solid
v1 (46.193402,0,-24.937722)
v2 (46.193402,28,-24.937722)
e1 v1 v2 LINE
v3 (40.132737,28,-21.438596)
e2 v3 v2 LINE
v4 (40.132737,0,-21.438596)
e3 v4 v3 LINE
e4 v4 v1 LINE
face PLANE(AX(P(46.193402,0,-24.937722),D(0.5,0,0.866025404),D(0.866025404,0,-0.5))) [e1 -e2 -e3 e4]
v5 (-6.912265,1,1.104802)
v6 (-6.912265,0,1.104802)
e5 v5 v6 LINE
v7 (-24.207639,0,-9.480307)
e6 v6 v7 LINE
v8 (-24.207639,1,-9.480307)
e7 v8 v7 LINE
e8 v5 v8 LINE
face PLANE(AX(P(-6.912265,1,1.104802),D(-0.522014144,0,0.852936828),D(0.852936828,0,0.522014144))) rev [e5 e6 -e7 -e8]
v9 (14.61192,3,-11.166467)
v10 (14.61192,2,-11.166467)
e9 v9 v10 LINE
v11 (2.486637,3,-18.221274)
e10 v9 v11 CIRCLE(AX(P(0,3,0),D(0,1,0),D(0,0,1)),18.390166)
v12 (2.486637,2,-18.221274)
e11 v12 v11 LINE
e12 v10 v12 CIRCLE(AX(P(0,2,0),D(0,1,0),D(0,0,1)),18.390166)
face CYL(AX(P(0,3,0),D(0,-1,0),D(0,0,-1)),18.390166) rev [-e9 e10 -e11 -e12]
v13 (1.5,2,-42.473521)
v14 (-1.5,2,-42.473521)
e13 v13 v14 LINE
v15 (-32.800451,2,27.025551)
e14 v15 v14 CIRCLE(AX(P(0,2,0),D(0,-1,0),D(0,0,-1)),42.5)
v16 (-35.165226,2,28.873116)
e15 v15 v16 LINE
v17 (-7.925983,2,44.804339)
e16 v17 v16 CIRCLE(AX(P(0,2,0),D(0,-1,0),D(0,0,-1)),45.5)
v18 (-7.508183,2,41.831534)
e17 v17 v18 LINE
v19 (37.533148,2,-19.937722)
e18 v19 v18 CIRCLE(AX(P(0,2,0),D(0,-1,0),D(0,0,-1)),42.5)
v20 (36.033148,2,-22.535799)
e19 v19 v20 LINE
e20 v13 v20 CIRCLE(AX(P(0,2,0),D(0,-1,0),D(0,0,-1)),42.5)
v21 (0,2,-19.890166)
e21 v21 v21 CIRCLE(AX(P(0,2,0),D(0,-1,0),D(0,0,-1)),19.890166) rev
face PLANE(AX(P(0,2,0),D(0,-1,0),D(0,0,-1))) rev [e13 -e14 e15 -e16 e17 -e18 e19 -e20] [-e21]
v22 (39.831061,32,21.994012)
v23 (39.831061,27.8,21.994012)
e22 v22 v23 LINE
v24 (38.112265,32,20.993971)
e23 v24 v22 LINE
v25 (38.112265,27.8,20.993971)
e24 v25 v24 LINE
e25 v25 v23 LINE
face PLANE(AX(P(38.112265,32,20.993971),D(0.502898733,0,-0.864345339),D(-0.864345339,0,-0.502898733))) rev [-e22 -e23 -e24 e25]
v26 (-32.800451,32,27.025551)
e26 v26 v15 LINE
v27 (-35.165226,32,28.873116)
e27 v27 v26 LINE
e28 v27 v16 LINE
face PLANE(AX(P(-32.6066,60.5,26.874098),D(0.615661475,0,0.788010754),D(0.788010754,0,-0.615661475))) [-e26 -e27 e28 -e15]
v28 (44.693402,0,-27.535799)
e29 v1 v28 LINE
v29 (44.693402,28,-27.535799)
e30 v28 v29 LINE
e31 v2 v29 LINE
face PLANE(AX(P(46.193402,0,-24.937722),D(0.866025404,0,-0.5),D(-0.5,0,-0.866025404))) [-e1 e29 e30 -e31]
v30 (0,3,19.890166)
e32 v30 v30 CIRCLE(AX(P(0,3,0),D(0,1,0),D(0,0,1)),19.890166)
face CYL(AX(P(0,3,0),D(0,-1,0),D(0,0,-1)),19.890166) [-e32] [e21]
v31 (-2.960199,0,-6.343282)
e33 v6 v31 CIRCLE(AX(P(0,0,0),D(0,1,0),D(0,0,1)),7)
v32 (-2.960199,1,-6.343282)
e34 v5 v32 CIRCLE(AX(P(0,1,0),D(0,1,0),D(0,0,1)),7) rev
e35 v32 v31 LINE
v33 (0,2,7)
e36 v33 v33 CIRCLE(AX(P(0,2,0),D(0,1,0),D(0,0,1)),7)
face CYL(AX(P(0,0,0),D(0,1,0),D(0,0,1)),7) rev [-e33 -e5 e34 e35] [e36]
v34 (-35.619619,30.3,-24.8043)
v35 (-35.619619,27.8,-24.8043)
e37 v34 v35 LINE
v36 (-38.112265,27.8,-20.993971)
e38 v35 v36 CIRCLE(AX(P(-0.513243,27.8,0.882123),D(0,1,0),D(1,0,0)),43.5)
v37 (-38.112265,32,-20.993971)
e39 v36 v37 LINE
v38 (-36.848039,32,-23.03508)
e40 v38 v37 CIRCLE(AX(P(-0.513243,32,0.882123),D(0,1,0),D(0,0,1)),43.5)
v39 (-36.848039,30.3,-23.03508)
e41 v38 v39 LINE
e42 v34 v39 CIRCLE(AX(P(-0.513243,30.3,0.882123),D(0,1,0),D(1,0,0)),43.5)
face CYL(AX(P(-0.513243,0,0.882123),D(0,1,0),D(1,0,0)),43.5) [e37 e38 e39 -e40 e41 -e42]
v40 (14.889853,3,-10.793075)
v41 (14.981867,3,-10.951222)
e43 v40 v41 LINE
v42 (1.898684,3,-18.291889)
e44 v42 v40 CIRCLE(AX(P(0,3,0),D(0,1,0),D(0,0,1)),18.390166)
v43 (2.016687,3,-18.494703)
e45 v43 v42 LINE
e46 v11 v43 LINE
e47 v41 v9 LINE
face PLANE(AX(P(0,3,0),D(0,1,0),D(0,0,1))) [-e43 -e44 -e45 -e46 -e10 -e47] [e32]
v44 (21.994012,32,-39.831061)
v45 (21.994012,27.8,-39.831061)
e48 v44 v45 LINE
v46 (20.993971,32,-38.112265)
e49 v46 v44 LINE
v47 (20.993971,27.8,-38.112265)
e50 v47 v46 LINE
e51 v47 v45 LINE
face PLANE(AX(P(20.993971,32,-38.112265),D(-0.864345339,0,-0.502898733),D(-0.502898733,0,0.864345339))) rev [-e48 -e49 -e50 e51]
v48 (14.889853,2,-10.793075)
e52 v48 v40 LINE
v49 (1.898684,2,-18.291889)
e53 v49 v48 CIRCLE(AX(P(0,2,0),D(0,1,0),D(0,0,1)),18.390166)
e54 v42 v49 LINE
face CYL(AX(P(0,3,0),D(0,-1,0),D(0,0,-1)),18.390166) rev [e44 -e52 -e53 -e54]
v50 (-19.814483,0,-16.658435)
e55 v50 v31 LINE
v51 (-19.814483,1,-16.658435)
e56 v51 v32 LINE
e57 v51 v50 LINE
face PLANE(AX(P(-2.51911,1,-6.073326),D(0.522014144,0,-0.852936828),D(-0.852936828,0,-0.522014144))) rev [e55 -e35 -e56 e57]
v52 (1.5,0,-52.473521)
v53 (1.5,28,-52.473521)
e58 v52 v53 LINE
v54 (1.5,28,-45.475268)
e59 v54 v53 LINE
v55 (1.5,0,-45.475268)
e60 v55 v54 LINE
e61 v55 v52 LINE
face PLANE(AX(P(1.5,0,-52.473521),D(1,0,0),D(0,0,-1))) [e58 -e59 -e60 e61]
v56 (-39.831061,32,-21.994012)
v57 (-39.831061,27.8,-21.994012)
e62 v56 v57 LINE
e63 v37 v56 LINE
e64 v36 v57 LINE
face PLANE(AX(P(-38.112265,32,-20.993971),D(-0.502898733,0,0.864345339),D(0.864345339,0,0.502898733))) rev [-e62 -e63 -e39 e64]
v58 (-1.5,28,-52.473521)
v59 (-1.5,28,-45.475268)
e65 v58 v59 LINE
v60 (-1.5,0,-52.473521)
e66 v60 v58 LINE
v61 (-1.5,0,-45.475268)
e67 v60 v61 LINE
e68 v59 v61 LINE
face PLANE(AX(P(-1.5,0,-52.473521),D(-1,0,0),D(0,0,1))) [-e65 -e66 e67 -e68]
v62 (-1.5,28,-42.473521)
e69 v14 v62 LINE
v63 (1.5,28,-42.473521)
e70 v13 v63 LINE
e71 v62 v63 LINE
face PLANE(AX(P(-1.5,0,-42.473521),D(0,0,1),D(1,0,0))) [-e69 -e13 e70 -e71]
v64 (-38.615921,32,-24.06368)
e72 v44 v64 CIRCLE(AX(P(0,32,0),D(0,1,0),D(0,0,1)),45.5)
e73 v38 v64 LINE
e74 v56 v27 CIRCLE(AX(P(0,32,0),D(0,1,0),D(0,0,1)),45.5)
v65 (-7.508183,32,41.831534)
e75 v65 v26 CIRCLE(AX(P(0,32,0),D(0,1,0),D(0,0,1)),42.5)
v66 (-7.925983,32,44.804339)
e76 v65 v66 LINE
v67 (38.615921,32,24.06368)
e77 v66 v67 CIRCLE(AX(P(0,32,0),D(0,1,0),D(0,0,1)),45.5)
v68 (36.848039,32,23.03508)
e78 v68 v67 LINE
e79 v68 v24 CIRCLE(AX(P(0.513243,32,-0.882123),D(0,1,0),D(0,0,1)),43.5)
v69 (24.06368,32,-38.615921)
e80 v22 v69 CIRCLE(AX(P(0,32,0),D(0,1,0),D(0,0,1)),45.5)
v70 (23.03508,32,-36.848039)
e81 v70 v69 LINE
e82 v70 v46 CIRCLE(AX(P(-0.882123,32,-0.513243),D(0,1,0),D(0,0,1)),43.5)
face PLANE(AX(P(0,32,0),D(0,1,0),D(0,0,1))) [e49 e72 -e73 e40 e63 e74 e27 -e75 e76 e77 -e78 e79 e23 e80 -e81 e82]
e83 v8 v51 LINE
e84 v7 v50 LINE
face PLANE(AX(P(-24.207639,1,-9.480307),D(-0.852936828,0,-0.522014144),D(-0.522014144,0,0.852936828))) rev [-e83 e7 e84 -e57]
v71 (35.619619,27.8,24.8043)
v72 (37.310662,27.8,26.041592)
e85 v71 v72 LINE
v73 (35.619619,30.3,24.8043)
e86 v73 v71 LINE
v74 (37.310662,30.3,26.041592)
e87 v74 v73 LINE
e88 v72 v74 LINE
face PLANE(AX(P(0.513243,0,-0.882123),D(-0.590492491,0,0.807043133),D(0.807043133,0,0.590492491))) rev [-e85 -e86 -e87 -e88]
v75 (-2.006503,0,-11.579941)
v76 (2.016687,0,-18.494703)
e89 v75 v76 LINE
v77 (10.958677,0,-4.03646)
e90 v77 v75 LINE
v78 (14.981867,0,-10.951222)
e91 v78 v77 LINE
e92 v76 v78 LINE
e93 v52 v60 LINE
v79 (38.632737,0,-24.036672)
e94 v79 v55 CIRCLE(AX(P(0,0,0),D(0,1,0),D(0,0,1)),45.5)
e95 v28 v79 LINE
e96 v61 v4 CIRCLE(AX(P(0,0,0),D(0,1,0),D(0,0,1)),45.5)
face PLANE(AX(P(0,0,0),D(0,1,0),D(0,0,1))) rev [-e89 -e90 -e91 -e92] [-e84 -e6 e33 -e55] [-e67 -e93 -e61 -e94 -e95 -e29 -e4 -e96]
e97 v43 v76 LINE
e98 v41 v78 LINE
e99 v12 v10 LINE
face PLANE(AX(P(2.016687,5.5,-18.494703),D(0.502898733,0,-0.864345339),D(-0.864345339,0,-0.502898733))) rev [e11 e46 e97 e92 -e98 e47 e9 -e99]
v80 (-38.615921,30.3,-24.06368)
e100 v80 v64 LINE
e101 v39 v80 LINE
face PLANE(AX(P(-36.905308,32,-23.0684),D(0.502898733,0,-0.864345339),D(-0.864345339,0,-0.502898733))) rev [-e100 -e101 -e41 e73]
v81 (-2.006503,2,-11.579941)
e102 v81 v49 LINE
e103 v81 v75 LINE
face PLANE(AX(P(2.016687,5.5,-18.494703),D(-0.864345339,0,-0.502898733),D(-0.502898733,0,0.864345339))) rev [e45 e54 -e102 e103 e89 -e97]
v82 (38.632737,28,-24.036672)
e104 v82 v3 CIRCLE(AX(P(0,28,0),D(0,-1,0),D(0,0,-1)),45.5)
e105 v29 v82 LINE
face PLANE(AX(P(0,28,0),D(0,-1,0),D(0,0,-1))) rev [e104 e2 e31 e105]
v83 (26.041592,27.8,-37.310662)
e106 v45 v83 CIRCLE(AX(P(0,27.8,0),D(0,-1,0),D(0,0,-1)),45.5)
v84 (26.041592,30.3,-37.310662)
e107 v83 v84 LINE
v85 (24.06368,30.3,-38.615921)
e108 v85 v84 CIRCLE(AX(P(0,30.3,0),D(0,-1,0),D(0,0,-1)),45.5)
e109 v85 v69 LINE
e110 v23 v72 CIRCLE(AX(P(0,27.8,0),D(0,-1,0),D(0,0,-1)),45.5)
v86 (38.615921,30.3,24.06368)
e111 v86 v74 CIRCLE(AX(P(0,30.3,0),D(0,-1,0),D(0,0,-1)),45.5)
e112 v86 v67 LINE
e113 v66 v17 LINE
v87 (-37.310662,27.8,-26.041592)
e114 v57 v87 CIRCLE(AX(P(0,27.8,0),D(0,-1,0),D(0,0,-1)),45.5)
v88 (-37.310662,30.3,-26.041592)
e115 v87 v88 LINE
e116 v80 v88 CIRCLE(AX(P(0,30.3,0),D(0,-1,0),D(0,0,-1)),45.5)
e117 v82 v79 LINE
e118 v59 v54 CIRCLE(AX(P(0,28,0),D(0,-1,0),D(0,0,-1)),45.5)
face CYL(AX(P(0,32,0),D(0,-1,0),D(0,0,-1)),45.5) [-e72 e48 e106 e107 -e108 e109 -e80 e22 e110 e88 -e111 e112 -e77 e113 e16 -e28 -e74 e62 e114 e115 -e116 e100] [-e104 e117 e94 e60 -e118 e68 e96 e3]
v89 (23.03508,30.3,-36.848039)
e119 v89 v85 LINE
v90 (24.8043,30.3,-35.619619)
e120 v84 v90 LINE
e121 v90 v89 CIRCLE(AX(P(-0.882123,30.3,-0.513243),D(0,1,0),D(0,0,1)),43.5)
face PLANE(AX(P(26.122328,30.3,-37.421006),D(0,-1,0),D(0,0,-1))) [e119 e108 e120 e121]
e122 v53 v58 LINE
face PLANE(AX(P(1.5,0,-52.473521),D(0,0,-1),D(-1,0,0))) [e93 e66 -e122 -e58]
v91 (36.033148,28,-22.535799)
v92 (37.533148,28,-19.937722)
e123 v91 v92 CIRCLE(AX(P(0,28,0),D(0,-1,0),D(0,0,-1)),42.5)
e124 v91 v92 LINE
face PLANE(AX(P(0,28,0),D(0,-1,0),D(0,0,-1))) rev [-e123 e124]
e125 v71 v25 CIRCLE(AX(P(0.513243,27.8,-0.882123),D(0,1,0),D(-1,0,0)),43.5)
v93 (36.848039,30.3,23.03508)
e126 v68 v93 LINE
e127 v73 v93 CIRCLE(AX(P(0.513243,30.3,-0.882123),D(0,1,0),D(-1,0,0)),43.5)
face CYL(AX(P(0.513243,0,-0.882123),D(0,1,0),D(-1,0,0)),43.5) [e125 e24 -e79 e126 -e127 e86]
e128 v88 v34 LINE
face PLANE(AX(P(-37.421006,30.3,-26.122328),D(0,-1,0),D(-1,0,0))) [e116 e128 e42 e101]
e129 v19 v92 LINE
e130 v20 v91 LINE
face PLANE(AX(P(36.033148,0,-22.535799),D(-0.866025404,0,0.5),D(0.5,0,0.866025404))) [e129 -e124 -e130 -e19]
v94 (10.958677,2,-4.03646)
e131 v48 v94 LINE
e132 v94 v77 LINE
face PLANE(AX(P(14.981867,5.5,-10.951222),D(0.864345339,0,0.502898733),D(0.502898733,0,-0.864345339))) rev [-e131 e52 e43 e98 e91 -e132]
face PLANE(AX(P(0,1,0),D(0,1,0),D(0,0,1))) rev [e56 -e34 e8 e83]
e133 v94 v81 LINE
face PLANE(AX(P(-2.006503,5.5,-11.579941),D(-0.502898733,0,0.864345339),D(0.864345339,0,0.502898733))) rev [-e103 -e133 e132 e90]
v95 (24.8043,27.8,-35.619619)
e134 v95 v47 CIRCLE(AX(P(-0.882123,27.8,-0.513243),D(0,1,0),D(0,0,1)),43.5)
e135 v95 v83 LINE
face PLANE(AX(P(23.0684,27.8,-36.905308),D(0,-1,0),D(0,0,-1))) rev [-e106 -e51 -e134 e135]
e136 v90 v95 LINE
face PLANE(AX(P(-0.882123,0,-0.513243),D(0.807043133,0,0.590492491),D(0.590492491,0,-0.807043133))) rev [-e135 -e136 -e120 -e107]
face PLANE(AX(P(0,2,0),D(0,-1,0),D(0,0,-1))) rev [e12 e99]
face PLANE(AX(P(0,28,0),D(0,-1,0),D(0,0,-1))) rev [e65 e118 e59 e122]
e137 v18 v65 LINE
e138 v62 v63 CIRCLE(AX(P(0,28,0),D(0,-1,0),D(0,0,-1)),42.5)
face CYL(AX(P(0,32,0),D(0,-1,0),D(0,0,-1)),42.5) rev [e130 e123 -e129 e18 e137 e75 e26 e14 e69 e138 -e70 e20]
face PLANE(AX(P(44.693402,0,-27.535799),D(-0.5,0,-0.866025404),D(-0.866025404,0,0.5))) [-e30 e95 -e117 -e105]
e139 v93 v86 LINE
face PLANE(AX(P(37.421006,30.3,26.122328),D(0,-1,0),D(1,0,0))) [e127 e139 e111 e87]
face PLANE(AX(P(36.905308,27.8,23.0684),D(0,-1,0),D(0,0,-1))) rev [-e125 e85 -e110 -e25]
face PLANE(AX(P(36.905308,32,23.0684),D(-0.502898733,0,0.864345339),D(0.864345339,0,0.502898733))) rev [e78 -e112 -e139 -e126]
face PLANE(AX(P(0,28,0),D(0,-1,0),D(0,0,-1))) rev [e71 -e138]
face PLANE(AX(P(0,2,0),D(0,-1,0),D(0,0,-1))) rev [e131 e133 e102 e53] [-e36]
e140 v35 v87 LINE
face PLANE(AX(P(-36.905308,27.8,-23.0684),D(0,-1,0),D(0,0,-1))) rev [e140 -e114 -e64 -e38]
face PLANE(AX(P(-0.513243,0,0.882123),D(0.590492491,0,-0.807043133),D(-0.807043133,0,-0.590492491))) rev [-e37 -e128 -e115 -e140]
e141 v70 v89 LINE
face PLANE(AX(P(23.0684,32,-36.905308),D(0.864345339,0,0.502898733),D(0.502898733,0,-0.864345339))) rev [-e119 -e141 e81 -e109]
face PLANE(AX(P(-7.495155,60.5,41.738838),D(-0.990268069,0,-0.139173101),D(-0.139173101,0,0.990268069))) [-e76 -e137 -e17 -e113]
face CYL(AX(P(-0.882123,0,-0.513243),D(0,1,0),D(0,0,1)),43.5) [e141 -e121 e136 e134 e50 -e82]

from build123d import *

# Parameters (mm, degrees)
SKETCH1_R                = 45.5
SKETCH1_R_2              = 42.5
BOSS_EXTRUDE1_DEPTH      = 32
SKETCH2_R                = 45.5
BOSS_EXTRUDE2_DEPTH      = 2
SKETCH3_R                = 7
CUT_EXTRUDE1_DEPTH       = 2
BOSS_EXTRUDE4_DEPTH      = 26
BOSS_EXTRUDE4_DEPTH_BACK = 2
SKETCH7_W                = 3
SKETCH7_H                = 10
SKETCH8_R                = 19.890165718
SKETCH8_R_2              = 18.390165718
BOSS_EXTRUDE5_DEPTH      = 1
CUT_EXTRUDE4_DEPTH       = 5.5
CUT_EXTRUDE5_DEPTH       = 58.5
CUT_EXTRUDE6_DEPTH       = 1
SKETCH13_W               = 2.4
SKETCH13_H               = 4.2
CUT_EXTRUDE7_DEPTH       = 2
SKETCH14_W               = 2.232083317
SKETCH14_H               = 2.5
CUT_REVOLVE1_ANGLE       = 6
CUT_REVOLVE2_START       = 30.3
CUT_REVOLVE2_DEPTH       = 1.7
CIRPATTERN1_COUNT        = 4
CUT_REVOLVE3_START       = 30.3
CUT_REVOLVE3_DEPTH       = 1.7
CUT_REVOLVE4_START       = 30.3
CUT_REVOLVE4_DEPTH       = 1.7


# Read off the part's stored shape, not the designer's step: Cut-Revolve2, Cut-Revolve3, Cut-Revolve4
with BuildPart() as part:
    # Sketch1 → Boss-Extrude1 (new body)
    with BuildSketch(Plane(origin=(0, 0, 0), x_dir=(1, 0, 0), z_dir=(0, 1, 0))):
        with Locations(Location((0, 0, 0), (0, 0, 270))):
            Circle(SKETCH1_R)
        with Locations(Location((0, 0, 0), (0, 0, 270))):
            Circle(SKETCH1_R_2, mode=Mode.SUBTRACT)
    extrude(amount=BOSS_EXTRUDE1_DEPTH)

    # Sketch2 → Boss-Extrude2 (add)
    with BuildSketch(Plane.XZ):
        with Locations(Location((0, 0, 0), (0, 0, 90))):
            Circle(SKETCH2_R)
    extrude(amount=-BOSS_EXTRUDE2_DEPTH)

    # Sketch3 → Cut-Extrude1 (cut)
    with BuildSketch(Plane(origin=(0, 2, 0), x_dir=(1, 0, 0), z_dir=(0, 1, 0))):
        with Locations(Location((0, 0, 0), (0, 0, 270))):
            Circle(SKETCH3_R)
    extrude(amount=-CUT_EXTRUDE1_DEPTH, mode=Mode.SUBTRACT)

    # Sketch7 → Boss-Extrude4 (add, two sides: drawn at the far end of the back side and taken through both)
    with BuildSketch(Plane(origin=(0, 2, 0), x_dir=(1, 0, 0), z_dir=(0, 1, 0)).offset(-BOSS_EXTRUDE4_DEPTH_BACK)):
        with Locations((0, 47.473521163)):
            Rectangle(SKETCH7_W, SKETCH7_H)
        Polygon((46.193402353, 24.937722476), (37.533148315, 19.937722476), (36.033148315, 22.535798687), (44.693402353, 27.535798687), align=None)
    extrude(amount=BOSS_EXTRUDE4_DEPTH + BOSS_EXTRUDE4_DEPTH_BACK)

    # Sketch8 → Boss-Extrude5 (add)
    with BuildSketch(Plane(origin=(0, 2, 0), x_dir=(1, 0, 0), z_dir=(0, 1, 0))):
        with Locations(Location((0, 0, 0), (0, 0, 90))):
            Circle(SKETCH8_R)
        with Locations(Location((0, 0, 0), (0, 0, 270))):
            Circle(SKETCH8_R_2, mode=Mode.SUBTRACT)
    extrude(amount=BOSS_EXTRUDE5_DEPTH)

    # Sketch10 → Cut-Extrude4 (cut)
    with BuildSketch(Plane.XZ):
        Polygon((2.016687189, -18.494703278), (14.981867268, -10.951222284), (10.958677405, -4.036459575), (-2.006502675, -11.579940569), align=None)
    extrude(amount=-CUT_EXTRUDE4_DEPTH, mode=Mode.SUBTRACT)

    # Sketch11 → Cut-Extrude5 (cut)
    with BuildSketch(Plane(origin=(0, 2, 0), x_dir=(1, 0, 0), z_dir=(0, 1, 0))):
        Polygon((-32.606600292, -26.874098434), (-35.165226496, -28.87311631), (-33.824988888, -37.754161376), (-11.7382848, -48.772412552), (-7.925983096, -44.804338986), (-7.495155029, -41.738838001), (-9.978475631, -35.419229659), (-25.965270809, -26.874098434), align=None)
    extrude(amount=CUT_EXTRUDE5_DEPTH, mode=Mode.SUBTRACT)

    # Sketch12 → Cut-Extrude6 (cut)
    with BuildSketch(Plane.XZ):
        Polygon((-6.912265346, 1.104802147), (-24.20763883, -9.480307189), (-19.814483018, -16.658435267), (-2.519109534, -6.073325931), align=None)
    extrude(amount=-CUT_EXTRUDE6_DEPTH, mode=Mode.SUBTRACT)

    # Sketch13 → Cut-Extrude7 (cut)
    with BuildSketch(Plane(origin=(22.881892348, 0, -39.327712908), x_dir=(-0.8643453386317811, 0, -0.5028987329328956), z_dir=(0.5028987329328954, 0, -0.864345338631781))):
        with Locations((-0.179431701, 29.9)):
            Rectangle(SKETCH13_W, SKETCH13_H)
    cut_extrude7 = extrude(amount=-CUT_EXTRUDE7_DEPTH, mode=Mode.SUBTRACT)

    # Sketch14 → Cut-Revolve1 (revolve, cut)
    with BuildSketch(Plane(origin=(-0.882123452, 0, -0.513242504), x_dir=(0.5028987329328954, 0, -0.8643453386317812), z_dir=(0.8643453386317812, 0, 0.5028987329328954))):
        with Locations((44.616041659, 29.05)):
            Rectangle(SKETCH14_W, SKETCH14_H)
    cut_revolve1 = revolve(axis=Axis((-0.882123452, 0, -0.513242504), (0, -1, 0)), revolution_arc=CUT_REVOLVE1_ANGLE, mode=Mode.SUBTRACT)

    # Cut-Revolve2 outline → Cut-Revolve2 (cut)
    with BuildSketch(Plane(origin=(0, 0, 0), x_dir=(1, 0, 0), z_dir=(0, 1, 0)).offset(CUT_REVOLVE2_START)):
        with BuildLine():
            ThreePointArc((20.993971431, 38.112264735), (22.023249251, 37.494236289), (23.035079503, 36.848038538))
            Line((23.035079503, 36.848038538), (23.068400244, 36.905307776))
            Line((23.068400244, 36.905307776), (20.993971431, 38.112264735))
        make_face()
    extrude(amount=CUT_REVOLVE2_DEPTH, mode=Mode.SUBTRACT)

    # CirPattern1: Cut-Extrude7, Cut-Revolve1 ×4 about axis
    cirpattern1_axis = Axis((0, 0, 0), (0, 1, 0))
    add([cut_extrude7.rotate(cirpattern1_axis, i * 360 / CIRPATTERN1_COUNT) for i in range(1, CIRPATTERN1_COUNT)], mode=Mode.SUBTRACT)
    add([cut_revolve1.rotate(cirpattern1_axis, i * 360 / CIRPATTERN1_COUNT) for i in range(1, CIRPATTERN1_COUNT)], mode=Mode.SUBTRACT)

    # Cut-Revolve3 outline → Cut-Revolve3 (cut)
    with BuildSketch(Plane(origin=(0, 0, 0), x_dir=(1, 0, 0), z_dir=(0, 1, 0)).offset(CUT_REVOLVE3_START)):
        with BuildLine():
            ThreePointArc((38.112264735, -20.993971431), (37.494236289, -22.023249251), (36.848038538, -23.035079503))
            Line((36.848038538, -23.035079503), (36.905307776, -23.068400244))
            Line((36.905307776, -23.068400244), (38.112264735, -20.993971431))
        make_face()
    extrude(amount=CUT_REVOLVE3_DEPTH, mode=Mode.SUBTRACT)

    # Cut-Revolve4 outline → Cut-Revolve4 (cut)
    with BuildSketch(Plane(origin=(0, 0, 0), x_dir=(1, 0, 0), z_dir=(0, 1, 0)).offset(CUT_REVOLVE4_START)):
        with BuildLine():
            ThreePointArc((-38.112264735, 20.993971431), (-37.494236289, 22.023249251), (-36.848038538, 23.035079503))
            Line((-36.848038538, 23.035079503), (-36.905307776, 23.068400244))
            Line((-36.905307776, 23.068400244), (-38.112264735, 20.993971431))
        make_face()
    extrude(amount=CUT_REVOLVE4_DEPTH, mode=Mode.SUBTRACT)


solid = part.part
